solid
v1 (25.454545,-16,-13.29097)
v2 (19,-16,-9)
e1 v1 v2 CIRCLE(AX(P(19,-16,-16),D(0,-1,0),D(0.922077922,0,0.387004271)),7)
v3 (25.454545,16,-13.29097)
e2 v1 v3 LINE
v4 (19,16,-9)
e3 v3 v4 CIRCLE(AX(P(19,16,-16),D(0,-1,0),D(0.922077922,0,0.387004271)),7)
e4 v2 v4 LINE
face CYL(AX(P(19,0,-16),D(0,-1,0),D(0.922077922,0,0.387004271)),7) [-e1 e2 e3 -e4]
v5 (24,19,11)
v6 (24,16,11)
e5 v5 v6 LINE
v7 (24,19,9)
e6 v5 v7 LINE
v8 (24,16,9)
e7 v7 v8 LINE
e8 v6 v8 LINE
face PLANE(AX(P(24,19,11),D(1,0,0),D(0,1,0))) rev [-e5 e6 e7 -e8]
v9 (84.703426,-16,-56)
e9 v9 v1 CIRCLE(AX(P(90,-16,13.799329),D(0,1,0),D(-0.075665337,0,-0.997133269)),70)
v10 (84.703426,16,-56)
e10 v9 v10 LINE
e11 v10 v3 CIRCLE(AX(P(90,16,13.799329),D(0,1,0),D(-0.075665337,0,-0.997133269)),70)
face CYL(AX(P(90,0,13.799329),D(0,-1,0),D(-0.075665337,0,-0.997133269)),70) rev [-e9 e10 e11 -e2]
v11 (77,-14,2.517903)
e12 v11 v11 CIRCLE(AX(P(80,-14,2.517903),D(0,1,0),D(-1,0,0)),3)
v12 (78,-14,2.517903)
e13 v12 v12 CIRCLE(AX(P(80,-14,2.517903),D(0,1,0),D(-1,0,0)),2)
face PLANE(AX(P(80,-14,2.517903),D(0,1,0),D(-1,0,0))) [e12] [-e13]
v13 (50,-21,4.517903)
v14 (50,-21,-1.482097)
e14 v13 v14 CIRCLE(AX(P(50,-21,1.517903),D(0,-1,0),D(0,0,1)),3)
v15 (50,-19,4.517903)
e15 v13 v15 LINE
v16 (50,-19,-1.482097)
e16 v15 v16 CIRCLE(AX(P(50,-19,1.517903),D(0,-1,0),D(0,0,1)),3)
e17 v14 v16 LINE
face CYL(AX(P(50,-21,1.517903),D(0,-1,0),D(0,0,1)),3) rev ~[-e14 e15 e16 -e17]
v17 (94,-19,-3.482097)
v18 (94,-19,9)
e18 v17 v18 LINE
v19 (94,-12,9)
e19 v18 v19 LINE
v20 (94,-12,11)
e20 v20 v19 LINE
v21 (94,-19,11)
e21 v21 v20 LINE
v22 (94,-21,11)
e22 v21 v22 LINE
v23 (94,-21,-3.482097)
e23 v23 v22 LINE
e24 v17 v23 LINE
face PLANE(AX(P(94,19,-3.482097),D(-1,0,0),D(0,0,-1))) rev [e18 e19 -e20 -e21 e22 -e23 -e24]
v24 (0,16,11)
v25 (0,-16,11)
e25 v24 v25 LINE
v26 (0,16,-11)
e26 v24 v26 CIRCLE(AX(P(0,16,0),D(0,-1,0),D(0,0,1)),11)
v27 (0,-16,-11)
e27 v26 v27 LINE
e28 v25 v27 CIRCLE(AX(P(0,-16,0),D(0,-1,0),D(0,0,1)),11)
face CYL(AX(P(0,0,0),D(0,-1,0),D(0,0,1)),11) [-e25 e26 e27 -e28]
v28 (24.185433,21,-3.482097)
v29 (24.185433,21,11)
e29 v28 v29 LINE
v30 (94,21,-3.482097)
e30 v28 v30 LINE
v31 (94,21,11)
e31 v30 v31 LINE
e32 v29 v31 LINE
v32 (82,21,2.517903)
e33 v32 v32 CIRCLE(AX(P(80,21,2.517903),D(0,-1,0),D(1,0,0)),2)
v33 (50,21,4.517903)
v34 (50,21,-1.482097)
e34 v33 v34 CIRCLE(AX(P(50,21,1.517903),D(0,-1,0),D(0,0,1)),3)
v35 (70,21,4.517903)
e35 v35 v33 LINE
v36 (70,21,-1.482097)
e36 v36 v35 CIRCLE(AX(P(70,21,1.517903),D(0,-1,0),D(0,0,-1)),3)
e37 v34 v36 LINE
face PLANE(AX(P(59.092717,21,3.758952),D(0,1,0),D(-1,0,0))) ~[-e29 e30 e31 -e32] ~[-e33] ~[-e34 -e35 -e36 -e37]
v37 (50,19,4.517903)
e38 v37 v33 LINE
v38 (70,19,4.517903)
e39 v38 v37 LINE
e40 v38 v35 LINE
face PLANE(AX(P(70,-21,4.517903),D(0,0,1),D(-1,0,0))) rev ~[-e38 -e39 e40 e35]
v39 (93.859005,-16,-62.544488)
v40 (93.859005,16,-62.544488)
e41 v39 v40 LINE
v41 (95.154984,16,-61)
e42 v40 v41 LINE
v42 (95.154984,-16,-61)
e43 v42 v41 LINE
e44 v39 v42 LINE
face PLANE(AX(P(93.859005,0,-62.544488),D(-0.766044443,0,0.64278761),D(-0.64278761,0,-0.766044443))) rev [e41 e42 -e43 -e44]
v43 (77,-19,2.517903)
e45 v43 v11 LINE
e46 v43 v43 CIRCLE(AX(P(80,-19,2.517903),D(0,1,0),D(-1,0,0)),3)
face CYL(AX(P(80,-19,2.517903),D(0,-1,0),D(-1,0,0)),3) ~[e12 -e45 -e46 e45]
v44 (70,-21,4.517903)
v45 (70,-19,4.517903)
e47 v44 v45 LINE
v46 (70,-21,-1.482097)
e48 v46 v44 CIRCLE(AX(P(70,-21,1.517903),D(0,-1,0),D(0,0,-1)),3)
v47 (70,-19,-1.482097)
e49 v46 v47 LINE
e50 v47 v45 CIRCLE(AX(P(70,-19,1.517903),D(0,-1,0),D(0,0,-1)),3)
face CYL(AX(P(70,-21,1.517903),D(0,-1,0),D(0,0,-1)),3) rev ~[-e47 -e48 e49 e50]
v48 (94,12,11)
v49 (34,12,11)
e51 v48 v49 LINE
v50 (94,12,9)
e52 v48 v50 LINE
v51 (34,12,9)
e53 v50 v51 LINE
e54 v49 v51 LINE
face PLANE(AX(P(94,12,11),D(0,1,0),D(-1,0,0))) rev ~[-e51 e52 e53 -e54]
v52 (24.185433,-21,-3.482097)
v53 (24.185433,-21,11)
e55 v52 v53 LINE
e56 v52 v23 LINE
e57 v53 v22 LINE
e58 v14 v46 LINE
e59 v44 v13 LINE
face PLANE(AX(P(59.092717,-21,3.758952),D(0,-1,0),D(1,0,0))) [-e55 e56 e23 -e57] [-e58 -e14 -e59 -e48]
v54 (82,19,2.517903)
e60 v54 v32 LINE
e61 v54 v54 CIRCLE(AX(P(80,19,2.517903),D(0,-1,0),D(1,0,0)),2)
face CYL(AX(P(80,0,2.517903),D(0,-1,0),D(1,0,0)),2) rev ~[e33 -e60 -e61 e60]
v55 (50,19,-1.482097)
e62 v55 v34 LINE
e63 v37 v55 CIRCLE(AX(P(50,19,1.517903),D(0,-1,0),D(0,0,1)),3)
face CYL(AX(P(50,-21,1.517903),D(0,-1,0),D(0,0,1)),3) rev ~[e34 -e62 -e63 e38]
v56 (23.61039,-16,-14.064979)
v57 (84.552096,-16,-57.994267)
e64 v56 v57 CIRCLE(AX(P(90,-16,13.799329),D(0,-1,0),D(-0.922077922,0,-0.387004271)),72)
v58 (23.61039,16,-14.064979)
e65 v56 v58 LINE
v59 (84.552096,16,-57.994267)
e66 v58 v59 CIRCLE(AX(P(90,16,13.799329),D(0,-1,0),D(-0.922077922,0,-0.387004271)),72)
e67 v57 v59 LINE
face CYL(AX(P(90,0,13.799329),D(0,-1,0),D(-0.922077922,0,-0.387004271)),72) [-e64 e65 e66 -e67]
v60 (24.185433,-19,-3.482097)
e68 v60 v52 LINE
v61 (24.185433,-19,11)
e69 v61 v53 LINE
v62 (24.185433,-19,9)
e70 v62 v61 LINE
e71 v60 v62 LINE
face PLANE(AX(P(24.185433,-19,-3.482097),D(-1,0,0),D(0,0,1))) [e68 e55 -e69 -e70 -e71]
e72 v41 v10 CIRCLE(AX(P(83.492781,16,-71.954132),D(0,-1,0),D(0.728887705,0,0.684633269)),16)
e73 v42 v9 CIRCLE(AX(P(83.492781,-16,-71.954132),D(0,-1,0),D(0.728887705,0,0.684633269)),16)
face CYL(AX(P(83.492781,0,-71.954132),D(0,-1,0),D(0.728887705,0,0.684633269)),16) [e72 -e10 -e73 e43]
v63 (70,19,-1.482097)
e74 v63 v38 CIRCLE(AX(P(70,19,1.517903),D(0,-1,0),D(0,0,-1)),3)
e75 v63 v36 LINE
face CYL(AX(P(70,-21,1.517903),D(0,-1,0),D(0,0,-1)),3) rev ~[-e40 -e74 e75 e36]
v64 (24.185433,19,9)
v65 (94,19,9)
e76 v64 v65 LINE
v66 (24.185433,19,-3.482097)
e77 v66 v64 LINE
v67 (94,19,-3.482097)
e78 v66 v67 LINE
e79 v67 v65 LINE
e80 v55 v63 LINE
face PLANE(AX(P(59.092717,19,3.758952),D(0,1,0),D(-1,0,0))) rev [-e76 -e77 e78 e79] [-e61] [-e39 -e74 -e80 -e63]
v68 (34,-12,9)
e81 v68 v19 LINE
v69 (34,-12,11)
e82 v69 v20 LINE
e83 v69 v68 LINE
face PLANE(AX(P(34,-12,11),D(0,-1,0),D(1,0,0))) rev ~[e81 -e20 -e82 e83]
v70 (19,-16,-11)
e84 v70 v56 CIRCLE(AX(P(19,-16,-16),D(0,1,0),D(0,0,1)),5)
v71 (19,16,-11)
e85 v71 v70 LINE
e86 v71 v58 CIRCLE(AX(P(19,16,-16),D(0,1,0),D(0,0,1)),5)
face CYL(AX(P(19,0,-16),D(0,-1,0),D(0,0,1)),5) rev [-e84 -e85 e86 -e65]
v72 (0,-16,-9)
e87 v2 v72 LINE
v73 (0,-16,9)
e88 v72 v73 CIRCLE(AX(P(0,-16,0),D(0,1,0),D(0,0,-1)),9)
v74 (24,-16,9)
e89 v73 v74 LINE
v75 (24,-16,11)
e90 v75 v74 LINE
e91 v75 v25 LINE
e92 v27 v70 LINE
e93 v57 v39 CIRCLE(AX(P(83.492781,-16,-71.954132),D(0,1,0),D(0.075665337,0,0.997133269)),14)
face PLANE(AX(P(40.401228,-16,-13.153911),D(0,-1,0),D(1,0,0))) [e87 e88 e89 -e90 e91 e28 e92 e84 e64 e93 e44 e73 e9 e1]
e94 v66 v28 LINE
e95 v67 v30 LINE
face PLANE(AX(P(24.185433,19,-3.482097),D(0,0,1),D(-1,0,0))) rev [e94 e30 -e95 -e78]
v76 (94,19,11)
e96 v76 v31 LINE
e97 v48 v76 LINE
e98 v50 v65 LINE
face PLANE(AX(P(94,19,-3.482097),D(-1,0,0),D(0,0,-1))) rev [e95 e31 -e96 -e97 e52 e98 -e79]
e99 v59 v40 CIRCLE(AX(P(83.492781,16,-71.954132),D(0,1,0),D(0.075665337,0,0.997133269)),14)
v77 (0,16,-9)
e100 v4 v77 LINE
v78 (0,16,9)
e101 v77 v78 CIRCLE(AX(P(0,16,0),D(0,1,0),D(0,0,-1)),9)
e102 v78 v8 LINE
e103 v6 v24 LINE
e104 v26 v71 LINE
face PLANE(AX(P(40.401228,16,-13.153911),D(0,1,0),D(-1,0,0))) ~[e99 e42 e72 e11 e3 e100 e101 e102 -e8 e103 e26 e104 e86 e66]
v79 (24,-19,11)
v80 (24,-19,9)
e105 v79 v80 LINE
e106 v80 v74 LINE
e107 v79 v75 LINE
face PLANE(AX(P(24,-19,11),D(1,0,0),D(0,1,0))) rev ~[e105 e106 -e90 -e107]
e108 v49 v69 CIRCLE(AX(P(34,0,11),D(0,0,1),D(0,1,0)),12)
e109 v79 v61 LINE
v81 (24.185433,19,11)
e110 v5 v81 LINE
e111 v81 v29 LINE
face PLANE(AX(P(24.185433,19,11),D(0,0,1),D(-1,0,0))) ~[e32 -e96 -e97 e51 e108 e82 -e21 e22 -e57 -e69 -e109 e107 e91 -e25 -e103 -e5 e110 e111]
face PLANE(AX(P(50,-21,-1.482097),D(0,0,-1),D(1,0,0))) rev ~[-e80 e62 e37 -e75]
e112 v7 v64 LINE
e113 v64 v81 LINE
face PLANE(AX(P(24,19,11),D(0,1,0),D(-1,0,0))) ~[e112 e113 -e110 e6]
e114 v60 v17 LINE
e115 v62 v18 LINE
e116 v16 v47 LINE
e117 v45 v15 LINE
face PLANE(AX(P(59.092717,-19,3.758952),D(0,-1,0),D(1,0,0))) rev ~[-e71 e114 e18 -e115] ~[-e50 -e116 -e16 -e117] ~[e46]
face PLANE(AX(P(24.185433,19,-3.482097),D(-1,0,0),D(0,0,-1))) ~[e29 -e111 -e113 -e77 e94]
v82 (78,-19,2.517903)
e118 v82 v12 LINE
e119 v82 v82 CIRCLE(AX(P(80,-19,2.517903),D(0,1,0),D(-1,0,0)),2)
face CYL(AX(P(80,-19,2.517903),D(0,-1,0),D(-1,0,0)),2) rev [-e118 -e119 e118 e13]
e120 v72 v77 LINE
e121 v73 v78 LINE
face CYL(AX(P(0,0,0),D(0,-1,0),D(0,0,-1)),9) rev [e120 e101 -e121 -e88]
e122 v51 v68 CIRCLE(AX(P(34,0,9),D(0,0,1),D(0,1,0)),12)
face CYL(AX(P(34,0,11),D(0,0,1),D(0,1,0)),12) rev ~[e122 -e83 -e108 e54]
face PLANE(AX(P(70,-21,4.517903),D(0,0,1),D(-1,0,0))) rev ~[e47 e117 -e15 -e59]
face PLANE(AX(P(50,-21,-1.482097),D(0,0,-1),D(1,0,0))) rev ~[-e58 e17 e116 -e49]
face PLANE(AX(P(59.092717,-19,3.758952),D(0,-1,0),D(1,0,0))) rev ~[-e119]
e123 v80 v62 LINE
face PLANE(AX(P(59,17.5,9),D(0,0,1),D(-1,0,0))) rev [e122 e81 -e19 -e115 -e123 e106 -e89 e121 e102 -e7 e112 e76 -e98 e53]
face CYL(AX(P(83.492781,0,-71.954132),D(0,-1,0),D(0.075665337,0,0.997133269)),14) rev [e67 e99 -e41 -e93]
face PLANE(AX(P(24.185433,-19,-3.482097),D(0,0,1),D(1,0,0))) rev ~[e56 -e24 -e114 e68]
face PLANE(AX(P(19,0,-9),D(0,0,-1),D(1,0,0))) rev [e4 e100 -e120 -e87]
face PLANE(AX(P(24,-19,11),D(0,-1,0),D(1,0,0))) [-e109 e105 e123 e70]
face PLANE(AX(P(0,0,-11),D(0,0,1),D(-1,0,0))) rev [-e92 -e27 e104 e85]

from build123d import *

# Parameters (mm, degrees)
F1_DEPTH  = 16
F3_W      = 70
F3_H      = 3
F4_DEPTH  = 2
F5_W      = 69.8145667315
F5_H      = 14.4820966907
F6_DEPTH  = 2
F9_DEPTH  = 2
F11_DEPTH = 42.001
F13_D     = 4
F13_DEPTH = 21.001
F14_R     = 3
F14_R_2   = 2
F15_DEPTH = 5


with BuildPart() as f1:
    # F0 (on Front) → F1 (new body)
    with BuildSketch(Plane.XZ):
        with BuildLine():
            Line((94, 11), (0, 11))
            ThreePointArc((0, 11), (-11, 0), (0, -11))
            Line((0, -11), (19, -11))
            ThreePointArc((19, -11), (21.7681124643, -11.8361612201), (23.6103896104, -14.064978646))
            ThreePointArc((23.6103896104, -14.064978646), (47.8977113224, -44.6078392712), (84.5520957277, -57.9942665386))
            ThreePointArc((84.5520957277, -57.9942665386), (89.6419160729, -59.3768457194), (93.8590048523, -62.5444881493))
            Line((93.8590048523, -62.5444881493), (95.1549842887, -61))
            ThreePointArc((95.1549842887, -61), (90.3976747979, -57.5207528796), (84.7034264019, -56))
            ThreePointArc((84.7034264019, -56), (49.0672193413, -42.9854179344), (25.4545454545, -13.2909701044))
            ThreePointArc((25.4545454545, -13.2909701044), (22.87535745, -10.1706257081), (19, -9))
            Line((19, -9), (0, -9))
            ThreePointArc((0, -9), (-9, 0), (0, 9))
            Line((0, 9), (94, 9))
            Line((94, 9), (94, 11))
        make_face()
    extrude(amount=F1_DEPTH)

    # F3 (on face) → F4 (join)
    with BuildSketch(Plane.XY.offset(11)):
        with Locations((59, -17.5)):
            Rectangle(F3_W, F3_H)
    extrude(amount=-F4_DEPTH)

    # F5 (on face) → F6 (join)
    with BuildSketch(Plane.XZ.offset(19)):
        with Locations((59.0927166343, 3.7589516547)):
            Rectangle(F5_W, F5_H)
    extrude(amount=F6_DEPTH)

    # F7: F1 across face


with BuildPart() as f1_1:
    add(f1.part)
    add(f1.part.mirror(Plane.XZ))

    # F8 (on face) → F9 (cut)
    with BuildSketch(Plane.XY.offset(11)):
        with BuildLine():
            Line((94, 12), (34, 12))
            ThreePointArc((34, 12), (22, 0), (34, -12))
            Line((34, -12), (94, -12))
            Line((94, -12), (94, 12))
        make_face()
    extrude(amount=-F9_DEPTH, mode=Mode.SUBTRACT)

    # F10 (on face) → F11 (cut, through all)
    with BuildSketch(Plane.XZ.offset(21)):
        with BuildLine():
            ThreePointArc((50, 4.5179033093), (47, 1.5179033093), (50, -1.4820966907))
            Line((50, -1.4820966907), (70, -1.4820966907))
            ThreePointArc((70, -1.4820966907), (73, 1.5179033093), (70, 4.5179033093))
            Line((70, 4.5179033093), (50, 4.5179033093))
        make_face()
    extrude(amount=-F11_DEPTH, mode=Mode.SUBTRACT)

    # F13 (through all, one way)
    with BuildSketch(Plane.XZ):
        with Locations((80, 2.5179033093)):
            Circle(F13_D / 2)
    extrude(amount=-F13_DEPTH, mode=Mode.SUBTRACT)

    # F14 (on face) → F15 (join)
    with BuildSketch(Plane(origin=(0, -19, 0), x_dir=(-1, 0, 0), z_dir=(0, 1, 0))):
        with Locations((-80, 2.5179033093)):
            Circle(F14_R)
        with Locations((-80, 2.5179033093)):
            Circle(F14_R_2, mode=Mode.SUBTRACT)
    extrude(amount=F15_DEPTH)


solid = f1_1.part
